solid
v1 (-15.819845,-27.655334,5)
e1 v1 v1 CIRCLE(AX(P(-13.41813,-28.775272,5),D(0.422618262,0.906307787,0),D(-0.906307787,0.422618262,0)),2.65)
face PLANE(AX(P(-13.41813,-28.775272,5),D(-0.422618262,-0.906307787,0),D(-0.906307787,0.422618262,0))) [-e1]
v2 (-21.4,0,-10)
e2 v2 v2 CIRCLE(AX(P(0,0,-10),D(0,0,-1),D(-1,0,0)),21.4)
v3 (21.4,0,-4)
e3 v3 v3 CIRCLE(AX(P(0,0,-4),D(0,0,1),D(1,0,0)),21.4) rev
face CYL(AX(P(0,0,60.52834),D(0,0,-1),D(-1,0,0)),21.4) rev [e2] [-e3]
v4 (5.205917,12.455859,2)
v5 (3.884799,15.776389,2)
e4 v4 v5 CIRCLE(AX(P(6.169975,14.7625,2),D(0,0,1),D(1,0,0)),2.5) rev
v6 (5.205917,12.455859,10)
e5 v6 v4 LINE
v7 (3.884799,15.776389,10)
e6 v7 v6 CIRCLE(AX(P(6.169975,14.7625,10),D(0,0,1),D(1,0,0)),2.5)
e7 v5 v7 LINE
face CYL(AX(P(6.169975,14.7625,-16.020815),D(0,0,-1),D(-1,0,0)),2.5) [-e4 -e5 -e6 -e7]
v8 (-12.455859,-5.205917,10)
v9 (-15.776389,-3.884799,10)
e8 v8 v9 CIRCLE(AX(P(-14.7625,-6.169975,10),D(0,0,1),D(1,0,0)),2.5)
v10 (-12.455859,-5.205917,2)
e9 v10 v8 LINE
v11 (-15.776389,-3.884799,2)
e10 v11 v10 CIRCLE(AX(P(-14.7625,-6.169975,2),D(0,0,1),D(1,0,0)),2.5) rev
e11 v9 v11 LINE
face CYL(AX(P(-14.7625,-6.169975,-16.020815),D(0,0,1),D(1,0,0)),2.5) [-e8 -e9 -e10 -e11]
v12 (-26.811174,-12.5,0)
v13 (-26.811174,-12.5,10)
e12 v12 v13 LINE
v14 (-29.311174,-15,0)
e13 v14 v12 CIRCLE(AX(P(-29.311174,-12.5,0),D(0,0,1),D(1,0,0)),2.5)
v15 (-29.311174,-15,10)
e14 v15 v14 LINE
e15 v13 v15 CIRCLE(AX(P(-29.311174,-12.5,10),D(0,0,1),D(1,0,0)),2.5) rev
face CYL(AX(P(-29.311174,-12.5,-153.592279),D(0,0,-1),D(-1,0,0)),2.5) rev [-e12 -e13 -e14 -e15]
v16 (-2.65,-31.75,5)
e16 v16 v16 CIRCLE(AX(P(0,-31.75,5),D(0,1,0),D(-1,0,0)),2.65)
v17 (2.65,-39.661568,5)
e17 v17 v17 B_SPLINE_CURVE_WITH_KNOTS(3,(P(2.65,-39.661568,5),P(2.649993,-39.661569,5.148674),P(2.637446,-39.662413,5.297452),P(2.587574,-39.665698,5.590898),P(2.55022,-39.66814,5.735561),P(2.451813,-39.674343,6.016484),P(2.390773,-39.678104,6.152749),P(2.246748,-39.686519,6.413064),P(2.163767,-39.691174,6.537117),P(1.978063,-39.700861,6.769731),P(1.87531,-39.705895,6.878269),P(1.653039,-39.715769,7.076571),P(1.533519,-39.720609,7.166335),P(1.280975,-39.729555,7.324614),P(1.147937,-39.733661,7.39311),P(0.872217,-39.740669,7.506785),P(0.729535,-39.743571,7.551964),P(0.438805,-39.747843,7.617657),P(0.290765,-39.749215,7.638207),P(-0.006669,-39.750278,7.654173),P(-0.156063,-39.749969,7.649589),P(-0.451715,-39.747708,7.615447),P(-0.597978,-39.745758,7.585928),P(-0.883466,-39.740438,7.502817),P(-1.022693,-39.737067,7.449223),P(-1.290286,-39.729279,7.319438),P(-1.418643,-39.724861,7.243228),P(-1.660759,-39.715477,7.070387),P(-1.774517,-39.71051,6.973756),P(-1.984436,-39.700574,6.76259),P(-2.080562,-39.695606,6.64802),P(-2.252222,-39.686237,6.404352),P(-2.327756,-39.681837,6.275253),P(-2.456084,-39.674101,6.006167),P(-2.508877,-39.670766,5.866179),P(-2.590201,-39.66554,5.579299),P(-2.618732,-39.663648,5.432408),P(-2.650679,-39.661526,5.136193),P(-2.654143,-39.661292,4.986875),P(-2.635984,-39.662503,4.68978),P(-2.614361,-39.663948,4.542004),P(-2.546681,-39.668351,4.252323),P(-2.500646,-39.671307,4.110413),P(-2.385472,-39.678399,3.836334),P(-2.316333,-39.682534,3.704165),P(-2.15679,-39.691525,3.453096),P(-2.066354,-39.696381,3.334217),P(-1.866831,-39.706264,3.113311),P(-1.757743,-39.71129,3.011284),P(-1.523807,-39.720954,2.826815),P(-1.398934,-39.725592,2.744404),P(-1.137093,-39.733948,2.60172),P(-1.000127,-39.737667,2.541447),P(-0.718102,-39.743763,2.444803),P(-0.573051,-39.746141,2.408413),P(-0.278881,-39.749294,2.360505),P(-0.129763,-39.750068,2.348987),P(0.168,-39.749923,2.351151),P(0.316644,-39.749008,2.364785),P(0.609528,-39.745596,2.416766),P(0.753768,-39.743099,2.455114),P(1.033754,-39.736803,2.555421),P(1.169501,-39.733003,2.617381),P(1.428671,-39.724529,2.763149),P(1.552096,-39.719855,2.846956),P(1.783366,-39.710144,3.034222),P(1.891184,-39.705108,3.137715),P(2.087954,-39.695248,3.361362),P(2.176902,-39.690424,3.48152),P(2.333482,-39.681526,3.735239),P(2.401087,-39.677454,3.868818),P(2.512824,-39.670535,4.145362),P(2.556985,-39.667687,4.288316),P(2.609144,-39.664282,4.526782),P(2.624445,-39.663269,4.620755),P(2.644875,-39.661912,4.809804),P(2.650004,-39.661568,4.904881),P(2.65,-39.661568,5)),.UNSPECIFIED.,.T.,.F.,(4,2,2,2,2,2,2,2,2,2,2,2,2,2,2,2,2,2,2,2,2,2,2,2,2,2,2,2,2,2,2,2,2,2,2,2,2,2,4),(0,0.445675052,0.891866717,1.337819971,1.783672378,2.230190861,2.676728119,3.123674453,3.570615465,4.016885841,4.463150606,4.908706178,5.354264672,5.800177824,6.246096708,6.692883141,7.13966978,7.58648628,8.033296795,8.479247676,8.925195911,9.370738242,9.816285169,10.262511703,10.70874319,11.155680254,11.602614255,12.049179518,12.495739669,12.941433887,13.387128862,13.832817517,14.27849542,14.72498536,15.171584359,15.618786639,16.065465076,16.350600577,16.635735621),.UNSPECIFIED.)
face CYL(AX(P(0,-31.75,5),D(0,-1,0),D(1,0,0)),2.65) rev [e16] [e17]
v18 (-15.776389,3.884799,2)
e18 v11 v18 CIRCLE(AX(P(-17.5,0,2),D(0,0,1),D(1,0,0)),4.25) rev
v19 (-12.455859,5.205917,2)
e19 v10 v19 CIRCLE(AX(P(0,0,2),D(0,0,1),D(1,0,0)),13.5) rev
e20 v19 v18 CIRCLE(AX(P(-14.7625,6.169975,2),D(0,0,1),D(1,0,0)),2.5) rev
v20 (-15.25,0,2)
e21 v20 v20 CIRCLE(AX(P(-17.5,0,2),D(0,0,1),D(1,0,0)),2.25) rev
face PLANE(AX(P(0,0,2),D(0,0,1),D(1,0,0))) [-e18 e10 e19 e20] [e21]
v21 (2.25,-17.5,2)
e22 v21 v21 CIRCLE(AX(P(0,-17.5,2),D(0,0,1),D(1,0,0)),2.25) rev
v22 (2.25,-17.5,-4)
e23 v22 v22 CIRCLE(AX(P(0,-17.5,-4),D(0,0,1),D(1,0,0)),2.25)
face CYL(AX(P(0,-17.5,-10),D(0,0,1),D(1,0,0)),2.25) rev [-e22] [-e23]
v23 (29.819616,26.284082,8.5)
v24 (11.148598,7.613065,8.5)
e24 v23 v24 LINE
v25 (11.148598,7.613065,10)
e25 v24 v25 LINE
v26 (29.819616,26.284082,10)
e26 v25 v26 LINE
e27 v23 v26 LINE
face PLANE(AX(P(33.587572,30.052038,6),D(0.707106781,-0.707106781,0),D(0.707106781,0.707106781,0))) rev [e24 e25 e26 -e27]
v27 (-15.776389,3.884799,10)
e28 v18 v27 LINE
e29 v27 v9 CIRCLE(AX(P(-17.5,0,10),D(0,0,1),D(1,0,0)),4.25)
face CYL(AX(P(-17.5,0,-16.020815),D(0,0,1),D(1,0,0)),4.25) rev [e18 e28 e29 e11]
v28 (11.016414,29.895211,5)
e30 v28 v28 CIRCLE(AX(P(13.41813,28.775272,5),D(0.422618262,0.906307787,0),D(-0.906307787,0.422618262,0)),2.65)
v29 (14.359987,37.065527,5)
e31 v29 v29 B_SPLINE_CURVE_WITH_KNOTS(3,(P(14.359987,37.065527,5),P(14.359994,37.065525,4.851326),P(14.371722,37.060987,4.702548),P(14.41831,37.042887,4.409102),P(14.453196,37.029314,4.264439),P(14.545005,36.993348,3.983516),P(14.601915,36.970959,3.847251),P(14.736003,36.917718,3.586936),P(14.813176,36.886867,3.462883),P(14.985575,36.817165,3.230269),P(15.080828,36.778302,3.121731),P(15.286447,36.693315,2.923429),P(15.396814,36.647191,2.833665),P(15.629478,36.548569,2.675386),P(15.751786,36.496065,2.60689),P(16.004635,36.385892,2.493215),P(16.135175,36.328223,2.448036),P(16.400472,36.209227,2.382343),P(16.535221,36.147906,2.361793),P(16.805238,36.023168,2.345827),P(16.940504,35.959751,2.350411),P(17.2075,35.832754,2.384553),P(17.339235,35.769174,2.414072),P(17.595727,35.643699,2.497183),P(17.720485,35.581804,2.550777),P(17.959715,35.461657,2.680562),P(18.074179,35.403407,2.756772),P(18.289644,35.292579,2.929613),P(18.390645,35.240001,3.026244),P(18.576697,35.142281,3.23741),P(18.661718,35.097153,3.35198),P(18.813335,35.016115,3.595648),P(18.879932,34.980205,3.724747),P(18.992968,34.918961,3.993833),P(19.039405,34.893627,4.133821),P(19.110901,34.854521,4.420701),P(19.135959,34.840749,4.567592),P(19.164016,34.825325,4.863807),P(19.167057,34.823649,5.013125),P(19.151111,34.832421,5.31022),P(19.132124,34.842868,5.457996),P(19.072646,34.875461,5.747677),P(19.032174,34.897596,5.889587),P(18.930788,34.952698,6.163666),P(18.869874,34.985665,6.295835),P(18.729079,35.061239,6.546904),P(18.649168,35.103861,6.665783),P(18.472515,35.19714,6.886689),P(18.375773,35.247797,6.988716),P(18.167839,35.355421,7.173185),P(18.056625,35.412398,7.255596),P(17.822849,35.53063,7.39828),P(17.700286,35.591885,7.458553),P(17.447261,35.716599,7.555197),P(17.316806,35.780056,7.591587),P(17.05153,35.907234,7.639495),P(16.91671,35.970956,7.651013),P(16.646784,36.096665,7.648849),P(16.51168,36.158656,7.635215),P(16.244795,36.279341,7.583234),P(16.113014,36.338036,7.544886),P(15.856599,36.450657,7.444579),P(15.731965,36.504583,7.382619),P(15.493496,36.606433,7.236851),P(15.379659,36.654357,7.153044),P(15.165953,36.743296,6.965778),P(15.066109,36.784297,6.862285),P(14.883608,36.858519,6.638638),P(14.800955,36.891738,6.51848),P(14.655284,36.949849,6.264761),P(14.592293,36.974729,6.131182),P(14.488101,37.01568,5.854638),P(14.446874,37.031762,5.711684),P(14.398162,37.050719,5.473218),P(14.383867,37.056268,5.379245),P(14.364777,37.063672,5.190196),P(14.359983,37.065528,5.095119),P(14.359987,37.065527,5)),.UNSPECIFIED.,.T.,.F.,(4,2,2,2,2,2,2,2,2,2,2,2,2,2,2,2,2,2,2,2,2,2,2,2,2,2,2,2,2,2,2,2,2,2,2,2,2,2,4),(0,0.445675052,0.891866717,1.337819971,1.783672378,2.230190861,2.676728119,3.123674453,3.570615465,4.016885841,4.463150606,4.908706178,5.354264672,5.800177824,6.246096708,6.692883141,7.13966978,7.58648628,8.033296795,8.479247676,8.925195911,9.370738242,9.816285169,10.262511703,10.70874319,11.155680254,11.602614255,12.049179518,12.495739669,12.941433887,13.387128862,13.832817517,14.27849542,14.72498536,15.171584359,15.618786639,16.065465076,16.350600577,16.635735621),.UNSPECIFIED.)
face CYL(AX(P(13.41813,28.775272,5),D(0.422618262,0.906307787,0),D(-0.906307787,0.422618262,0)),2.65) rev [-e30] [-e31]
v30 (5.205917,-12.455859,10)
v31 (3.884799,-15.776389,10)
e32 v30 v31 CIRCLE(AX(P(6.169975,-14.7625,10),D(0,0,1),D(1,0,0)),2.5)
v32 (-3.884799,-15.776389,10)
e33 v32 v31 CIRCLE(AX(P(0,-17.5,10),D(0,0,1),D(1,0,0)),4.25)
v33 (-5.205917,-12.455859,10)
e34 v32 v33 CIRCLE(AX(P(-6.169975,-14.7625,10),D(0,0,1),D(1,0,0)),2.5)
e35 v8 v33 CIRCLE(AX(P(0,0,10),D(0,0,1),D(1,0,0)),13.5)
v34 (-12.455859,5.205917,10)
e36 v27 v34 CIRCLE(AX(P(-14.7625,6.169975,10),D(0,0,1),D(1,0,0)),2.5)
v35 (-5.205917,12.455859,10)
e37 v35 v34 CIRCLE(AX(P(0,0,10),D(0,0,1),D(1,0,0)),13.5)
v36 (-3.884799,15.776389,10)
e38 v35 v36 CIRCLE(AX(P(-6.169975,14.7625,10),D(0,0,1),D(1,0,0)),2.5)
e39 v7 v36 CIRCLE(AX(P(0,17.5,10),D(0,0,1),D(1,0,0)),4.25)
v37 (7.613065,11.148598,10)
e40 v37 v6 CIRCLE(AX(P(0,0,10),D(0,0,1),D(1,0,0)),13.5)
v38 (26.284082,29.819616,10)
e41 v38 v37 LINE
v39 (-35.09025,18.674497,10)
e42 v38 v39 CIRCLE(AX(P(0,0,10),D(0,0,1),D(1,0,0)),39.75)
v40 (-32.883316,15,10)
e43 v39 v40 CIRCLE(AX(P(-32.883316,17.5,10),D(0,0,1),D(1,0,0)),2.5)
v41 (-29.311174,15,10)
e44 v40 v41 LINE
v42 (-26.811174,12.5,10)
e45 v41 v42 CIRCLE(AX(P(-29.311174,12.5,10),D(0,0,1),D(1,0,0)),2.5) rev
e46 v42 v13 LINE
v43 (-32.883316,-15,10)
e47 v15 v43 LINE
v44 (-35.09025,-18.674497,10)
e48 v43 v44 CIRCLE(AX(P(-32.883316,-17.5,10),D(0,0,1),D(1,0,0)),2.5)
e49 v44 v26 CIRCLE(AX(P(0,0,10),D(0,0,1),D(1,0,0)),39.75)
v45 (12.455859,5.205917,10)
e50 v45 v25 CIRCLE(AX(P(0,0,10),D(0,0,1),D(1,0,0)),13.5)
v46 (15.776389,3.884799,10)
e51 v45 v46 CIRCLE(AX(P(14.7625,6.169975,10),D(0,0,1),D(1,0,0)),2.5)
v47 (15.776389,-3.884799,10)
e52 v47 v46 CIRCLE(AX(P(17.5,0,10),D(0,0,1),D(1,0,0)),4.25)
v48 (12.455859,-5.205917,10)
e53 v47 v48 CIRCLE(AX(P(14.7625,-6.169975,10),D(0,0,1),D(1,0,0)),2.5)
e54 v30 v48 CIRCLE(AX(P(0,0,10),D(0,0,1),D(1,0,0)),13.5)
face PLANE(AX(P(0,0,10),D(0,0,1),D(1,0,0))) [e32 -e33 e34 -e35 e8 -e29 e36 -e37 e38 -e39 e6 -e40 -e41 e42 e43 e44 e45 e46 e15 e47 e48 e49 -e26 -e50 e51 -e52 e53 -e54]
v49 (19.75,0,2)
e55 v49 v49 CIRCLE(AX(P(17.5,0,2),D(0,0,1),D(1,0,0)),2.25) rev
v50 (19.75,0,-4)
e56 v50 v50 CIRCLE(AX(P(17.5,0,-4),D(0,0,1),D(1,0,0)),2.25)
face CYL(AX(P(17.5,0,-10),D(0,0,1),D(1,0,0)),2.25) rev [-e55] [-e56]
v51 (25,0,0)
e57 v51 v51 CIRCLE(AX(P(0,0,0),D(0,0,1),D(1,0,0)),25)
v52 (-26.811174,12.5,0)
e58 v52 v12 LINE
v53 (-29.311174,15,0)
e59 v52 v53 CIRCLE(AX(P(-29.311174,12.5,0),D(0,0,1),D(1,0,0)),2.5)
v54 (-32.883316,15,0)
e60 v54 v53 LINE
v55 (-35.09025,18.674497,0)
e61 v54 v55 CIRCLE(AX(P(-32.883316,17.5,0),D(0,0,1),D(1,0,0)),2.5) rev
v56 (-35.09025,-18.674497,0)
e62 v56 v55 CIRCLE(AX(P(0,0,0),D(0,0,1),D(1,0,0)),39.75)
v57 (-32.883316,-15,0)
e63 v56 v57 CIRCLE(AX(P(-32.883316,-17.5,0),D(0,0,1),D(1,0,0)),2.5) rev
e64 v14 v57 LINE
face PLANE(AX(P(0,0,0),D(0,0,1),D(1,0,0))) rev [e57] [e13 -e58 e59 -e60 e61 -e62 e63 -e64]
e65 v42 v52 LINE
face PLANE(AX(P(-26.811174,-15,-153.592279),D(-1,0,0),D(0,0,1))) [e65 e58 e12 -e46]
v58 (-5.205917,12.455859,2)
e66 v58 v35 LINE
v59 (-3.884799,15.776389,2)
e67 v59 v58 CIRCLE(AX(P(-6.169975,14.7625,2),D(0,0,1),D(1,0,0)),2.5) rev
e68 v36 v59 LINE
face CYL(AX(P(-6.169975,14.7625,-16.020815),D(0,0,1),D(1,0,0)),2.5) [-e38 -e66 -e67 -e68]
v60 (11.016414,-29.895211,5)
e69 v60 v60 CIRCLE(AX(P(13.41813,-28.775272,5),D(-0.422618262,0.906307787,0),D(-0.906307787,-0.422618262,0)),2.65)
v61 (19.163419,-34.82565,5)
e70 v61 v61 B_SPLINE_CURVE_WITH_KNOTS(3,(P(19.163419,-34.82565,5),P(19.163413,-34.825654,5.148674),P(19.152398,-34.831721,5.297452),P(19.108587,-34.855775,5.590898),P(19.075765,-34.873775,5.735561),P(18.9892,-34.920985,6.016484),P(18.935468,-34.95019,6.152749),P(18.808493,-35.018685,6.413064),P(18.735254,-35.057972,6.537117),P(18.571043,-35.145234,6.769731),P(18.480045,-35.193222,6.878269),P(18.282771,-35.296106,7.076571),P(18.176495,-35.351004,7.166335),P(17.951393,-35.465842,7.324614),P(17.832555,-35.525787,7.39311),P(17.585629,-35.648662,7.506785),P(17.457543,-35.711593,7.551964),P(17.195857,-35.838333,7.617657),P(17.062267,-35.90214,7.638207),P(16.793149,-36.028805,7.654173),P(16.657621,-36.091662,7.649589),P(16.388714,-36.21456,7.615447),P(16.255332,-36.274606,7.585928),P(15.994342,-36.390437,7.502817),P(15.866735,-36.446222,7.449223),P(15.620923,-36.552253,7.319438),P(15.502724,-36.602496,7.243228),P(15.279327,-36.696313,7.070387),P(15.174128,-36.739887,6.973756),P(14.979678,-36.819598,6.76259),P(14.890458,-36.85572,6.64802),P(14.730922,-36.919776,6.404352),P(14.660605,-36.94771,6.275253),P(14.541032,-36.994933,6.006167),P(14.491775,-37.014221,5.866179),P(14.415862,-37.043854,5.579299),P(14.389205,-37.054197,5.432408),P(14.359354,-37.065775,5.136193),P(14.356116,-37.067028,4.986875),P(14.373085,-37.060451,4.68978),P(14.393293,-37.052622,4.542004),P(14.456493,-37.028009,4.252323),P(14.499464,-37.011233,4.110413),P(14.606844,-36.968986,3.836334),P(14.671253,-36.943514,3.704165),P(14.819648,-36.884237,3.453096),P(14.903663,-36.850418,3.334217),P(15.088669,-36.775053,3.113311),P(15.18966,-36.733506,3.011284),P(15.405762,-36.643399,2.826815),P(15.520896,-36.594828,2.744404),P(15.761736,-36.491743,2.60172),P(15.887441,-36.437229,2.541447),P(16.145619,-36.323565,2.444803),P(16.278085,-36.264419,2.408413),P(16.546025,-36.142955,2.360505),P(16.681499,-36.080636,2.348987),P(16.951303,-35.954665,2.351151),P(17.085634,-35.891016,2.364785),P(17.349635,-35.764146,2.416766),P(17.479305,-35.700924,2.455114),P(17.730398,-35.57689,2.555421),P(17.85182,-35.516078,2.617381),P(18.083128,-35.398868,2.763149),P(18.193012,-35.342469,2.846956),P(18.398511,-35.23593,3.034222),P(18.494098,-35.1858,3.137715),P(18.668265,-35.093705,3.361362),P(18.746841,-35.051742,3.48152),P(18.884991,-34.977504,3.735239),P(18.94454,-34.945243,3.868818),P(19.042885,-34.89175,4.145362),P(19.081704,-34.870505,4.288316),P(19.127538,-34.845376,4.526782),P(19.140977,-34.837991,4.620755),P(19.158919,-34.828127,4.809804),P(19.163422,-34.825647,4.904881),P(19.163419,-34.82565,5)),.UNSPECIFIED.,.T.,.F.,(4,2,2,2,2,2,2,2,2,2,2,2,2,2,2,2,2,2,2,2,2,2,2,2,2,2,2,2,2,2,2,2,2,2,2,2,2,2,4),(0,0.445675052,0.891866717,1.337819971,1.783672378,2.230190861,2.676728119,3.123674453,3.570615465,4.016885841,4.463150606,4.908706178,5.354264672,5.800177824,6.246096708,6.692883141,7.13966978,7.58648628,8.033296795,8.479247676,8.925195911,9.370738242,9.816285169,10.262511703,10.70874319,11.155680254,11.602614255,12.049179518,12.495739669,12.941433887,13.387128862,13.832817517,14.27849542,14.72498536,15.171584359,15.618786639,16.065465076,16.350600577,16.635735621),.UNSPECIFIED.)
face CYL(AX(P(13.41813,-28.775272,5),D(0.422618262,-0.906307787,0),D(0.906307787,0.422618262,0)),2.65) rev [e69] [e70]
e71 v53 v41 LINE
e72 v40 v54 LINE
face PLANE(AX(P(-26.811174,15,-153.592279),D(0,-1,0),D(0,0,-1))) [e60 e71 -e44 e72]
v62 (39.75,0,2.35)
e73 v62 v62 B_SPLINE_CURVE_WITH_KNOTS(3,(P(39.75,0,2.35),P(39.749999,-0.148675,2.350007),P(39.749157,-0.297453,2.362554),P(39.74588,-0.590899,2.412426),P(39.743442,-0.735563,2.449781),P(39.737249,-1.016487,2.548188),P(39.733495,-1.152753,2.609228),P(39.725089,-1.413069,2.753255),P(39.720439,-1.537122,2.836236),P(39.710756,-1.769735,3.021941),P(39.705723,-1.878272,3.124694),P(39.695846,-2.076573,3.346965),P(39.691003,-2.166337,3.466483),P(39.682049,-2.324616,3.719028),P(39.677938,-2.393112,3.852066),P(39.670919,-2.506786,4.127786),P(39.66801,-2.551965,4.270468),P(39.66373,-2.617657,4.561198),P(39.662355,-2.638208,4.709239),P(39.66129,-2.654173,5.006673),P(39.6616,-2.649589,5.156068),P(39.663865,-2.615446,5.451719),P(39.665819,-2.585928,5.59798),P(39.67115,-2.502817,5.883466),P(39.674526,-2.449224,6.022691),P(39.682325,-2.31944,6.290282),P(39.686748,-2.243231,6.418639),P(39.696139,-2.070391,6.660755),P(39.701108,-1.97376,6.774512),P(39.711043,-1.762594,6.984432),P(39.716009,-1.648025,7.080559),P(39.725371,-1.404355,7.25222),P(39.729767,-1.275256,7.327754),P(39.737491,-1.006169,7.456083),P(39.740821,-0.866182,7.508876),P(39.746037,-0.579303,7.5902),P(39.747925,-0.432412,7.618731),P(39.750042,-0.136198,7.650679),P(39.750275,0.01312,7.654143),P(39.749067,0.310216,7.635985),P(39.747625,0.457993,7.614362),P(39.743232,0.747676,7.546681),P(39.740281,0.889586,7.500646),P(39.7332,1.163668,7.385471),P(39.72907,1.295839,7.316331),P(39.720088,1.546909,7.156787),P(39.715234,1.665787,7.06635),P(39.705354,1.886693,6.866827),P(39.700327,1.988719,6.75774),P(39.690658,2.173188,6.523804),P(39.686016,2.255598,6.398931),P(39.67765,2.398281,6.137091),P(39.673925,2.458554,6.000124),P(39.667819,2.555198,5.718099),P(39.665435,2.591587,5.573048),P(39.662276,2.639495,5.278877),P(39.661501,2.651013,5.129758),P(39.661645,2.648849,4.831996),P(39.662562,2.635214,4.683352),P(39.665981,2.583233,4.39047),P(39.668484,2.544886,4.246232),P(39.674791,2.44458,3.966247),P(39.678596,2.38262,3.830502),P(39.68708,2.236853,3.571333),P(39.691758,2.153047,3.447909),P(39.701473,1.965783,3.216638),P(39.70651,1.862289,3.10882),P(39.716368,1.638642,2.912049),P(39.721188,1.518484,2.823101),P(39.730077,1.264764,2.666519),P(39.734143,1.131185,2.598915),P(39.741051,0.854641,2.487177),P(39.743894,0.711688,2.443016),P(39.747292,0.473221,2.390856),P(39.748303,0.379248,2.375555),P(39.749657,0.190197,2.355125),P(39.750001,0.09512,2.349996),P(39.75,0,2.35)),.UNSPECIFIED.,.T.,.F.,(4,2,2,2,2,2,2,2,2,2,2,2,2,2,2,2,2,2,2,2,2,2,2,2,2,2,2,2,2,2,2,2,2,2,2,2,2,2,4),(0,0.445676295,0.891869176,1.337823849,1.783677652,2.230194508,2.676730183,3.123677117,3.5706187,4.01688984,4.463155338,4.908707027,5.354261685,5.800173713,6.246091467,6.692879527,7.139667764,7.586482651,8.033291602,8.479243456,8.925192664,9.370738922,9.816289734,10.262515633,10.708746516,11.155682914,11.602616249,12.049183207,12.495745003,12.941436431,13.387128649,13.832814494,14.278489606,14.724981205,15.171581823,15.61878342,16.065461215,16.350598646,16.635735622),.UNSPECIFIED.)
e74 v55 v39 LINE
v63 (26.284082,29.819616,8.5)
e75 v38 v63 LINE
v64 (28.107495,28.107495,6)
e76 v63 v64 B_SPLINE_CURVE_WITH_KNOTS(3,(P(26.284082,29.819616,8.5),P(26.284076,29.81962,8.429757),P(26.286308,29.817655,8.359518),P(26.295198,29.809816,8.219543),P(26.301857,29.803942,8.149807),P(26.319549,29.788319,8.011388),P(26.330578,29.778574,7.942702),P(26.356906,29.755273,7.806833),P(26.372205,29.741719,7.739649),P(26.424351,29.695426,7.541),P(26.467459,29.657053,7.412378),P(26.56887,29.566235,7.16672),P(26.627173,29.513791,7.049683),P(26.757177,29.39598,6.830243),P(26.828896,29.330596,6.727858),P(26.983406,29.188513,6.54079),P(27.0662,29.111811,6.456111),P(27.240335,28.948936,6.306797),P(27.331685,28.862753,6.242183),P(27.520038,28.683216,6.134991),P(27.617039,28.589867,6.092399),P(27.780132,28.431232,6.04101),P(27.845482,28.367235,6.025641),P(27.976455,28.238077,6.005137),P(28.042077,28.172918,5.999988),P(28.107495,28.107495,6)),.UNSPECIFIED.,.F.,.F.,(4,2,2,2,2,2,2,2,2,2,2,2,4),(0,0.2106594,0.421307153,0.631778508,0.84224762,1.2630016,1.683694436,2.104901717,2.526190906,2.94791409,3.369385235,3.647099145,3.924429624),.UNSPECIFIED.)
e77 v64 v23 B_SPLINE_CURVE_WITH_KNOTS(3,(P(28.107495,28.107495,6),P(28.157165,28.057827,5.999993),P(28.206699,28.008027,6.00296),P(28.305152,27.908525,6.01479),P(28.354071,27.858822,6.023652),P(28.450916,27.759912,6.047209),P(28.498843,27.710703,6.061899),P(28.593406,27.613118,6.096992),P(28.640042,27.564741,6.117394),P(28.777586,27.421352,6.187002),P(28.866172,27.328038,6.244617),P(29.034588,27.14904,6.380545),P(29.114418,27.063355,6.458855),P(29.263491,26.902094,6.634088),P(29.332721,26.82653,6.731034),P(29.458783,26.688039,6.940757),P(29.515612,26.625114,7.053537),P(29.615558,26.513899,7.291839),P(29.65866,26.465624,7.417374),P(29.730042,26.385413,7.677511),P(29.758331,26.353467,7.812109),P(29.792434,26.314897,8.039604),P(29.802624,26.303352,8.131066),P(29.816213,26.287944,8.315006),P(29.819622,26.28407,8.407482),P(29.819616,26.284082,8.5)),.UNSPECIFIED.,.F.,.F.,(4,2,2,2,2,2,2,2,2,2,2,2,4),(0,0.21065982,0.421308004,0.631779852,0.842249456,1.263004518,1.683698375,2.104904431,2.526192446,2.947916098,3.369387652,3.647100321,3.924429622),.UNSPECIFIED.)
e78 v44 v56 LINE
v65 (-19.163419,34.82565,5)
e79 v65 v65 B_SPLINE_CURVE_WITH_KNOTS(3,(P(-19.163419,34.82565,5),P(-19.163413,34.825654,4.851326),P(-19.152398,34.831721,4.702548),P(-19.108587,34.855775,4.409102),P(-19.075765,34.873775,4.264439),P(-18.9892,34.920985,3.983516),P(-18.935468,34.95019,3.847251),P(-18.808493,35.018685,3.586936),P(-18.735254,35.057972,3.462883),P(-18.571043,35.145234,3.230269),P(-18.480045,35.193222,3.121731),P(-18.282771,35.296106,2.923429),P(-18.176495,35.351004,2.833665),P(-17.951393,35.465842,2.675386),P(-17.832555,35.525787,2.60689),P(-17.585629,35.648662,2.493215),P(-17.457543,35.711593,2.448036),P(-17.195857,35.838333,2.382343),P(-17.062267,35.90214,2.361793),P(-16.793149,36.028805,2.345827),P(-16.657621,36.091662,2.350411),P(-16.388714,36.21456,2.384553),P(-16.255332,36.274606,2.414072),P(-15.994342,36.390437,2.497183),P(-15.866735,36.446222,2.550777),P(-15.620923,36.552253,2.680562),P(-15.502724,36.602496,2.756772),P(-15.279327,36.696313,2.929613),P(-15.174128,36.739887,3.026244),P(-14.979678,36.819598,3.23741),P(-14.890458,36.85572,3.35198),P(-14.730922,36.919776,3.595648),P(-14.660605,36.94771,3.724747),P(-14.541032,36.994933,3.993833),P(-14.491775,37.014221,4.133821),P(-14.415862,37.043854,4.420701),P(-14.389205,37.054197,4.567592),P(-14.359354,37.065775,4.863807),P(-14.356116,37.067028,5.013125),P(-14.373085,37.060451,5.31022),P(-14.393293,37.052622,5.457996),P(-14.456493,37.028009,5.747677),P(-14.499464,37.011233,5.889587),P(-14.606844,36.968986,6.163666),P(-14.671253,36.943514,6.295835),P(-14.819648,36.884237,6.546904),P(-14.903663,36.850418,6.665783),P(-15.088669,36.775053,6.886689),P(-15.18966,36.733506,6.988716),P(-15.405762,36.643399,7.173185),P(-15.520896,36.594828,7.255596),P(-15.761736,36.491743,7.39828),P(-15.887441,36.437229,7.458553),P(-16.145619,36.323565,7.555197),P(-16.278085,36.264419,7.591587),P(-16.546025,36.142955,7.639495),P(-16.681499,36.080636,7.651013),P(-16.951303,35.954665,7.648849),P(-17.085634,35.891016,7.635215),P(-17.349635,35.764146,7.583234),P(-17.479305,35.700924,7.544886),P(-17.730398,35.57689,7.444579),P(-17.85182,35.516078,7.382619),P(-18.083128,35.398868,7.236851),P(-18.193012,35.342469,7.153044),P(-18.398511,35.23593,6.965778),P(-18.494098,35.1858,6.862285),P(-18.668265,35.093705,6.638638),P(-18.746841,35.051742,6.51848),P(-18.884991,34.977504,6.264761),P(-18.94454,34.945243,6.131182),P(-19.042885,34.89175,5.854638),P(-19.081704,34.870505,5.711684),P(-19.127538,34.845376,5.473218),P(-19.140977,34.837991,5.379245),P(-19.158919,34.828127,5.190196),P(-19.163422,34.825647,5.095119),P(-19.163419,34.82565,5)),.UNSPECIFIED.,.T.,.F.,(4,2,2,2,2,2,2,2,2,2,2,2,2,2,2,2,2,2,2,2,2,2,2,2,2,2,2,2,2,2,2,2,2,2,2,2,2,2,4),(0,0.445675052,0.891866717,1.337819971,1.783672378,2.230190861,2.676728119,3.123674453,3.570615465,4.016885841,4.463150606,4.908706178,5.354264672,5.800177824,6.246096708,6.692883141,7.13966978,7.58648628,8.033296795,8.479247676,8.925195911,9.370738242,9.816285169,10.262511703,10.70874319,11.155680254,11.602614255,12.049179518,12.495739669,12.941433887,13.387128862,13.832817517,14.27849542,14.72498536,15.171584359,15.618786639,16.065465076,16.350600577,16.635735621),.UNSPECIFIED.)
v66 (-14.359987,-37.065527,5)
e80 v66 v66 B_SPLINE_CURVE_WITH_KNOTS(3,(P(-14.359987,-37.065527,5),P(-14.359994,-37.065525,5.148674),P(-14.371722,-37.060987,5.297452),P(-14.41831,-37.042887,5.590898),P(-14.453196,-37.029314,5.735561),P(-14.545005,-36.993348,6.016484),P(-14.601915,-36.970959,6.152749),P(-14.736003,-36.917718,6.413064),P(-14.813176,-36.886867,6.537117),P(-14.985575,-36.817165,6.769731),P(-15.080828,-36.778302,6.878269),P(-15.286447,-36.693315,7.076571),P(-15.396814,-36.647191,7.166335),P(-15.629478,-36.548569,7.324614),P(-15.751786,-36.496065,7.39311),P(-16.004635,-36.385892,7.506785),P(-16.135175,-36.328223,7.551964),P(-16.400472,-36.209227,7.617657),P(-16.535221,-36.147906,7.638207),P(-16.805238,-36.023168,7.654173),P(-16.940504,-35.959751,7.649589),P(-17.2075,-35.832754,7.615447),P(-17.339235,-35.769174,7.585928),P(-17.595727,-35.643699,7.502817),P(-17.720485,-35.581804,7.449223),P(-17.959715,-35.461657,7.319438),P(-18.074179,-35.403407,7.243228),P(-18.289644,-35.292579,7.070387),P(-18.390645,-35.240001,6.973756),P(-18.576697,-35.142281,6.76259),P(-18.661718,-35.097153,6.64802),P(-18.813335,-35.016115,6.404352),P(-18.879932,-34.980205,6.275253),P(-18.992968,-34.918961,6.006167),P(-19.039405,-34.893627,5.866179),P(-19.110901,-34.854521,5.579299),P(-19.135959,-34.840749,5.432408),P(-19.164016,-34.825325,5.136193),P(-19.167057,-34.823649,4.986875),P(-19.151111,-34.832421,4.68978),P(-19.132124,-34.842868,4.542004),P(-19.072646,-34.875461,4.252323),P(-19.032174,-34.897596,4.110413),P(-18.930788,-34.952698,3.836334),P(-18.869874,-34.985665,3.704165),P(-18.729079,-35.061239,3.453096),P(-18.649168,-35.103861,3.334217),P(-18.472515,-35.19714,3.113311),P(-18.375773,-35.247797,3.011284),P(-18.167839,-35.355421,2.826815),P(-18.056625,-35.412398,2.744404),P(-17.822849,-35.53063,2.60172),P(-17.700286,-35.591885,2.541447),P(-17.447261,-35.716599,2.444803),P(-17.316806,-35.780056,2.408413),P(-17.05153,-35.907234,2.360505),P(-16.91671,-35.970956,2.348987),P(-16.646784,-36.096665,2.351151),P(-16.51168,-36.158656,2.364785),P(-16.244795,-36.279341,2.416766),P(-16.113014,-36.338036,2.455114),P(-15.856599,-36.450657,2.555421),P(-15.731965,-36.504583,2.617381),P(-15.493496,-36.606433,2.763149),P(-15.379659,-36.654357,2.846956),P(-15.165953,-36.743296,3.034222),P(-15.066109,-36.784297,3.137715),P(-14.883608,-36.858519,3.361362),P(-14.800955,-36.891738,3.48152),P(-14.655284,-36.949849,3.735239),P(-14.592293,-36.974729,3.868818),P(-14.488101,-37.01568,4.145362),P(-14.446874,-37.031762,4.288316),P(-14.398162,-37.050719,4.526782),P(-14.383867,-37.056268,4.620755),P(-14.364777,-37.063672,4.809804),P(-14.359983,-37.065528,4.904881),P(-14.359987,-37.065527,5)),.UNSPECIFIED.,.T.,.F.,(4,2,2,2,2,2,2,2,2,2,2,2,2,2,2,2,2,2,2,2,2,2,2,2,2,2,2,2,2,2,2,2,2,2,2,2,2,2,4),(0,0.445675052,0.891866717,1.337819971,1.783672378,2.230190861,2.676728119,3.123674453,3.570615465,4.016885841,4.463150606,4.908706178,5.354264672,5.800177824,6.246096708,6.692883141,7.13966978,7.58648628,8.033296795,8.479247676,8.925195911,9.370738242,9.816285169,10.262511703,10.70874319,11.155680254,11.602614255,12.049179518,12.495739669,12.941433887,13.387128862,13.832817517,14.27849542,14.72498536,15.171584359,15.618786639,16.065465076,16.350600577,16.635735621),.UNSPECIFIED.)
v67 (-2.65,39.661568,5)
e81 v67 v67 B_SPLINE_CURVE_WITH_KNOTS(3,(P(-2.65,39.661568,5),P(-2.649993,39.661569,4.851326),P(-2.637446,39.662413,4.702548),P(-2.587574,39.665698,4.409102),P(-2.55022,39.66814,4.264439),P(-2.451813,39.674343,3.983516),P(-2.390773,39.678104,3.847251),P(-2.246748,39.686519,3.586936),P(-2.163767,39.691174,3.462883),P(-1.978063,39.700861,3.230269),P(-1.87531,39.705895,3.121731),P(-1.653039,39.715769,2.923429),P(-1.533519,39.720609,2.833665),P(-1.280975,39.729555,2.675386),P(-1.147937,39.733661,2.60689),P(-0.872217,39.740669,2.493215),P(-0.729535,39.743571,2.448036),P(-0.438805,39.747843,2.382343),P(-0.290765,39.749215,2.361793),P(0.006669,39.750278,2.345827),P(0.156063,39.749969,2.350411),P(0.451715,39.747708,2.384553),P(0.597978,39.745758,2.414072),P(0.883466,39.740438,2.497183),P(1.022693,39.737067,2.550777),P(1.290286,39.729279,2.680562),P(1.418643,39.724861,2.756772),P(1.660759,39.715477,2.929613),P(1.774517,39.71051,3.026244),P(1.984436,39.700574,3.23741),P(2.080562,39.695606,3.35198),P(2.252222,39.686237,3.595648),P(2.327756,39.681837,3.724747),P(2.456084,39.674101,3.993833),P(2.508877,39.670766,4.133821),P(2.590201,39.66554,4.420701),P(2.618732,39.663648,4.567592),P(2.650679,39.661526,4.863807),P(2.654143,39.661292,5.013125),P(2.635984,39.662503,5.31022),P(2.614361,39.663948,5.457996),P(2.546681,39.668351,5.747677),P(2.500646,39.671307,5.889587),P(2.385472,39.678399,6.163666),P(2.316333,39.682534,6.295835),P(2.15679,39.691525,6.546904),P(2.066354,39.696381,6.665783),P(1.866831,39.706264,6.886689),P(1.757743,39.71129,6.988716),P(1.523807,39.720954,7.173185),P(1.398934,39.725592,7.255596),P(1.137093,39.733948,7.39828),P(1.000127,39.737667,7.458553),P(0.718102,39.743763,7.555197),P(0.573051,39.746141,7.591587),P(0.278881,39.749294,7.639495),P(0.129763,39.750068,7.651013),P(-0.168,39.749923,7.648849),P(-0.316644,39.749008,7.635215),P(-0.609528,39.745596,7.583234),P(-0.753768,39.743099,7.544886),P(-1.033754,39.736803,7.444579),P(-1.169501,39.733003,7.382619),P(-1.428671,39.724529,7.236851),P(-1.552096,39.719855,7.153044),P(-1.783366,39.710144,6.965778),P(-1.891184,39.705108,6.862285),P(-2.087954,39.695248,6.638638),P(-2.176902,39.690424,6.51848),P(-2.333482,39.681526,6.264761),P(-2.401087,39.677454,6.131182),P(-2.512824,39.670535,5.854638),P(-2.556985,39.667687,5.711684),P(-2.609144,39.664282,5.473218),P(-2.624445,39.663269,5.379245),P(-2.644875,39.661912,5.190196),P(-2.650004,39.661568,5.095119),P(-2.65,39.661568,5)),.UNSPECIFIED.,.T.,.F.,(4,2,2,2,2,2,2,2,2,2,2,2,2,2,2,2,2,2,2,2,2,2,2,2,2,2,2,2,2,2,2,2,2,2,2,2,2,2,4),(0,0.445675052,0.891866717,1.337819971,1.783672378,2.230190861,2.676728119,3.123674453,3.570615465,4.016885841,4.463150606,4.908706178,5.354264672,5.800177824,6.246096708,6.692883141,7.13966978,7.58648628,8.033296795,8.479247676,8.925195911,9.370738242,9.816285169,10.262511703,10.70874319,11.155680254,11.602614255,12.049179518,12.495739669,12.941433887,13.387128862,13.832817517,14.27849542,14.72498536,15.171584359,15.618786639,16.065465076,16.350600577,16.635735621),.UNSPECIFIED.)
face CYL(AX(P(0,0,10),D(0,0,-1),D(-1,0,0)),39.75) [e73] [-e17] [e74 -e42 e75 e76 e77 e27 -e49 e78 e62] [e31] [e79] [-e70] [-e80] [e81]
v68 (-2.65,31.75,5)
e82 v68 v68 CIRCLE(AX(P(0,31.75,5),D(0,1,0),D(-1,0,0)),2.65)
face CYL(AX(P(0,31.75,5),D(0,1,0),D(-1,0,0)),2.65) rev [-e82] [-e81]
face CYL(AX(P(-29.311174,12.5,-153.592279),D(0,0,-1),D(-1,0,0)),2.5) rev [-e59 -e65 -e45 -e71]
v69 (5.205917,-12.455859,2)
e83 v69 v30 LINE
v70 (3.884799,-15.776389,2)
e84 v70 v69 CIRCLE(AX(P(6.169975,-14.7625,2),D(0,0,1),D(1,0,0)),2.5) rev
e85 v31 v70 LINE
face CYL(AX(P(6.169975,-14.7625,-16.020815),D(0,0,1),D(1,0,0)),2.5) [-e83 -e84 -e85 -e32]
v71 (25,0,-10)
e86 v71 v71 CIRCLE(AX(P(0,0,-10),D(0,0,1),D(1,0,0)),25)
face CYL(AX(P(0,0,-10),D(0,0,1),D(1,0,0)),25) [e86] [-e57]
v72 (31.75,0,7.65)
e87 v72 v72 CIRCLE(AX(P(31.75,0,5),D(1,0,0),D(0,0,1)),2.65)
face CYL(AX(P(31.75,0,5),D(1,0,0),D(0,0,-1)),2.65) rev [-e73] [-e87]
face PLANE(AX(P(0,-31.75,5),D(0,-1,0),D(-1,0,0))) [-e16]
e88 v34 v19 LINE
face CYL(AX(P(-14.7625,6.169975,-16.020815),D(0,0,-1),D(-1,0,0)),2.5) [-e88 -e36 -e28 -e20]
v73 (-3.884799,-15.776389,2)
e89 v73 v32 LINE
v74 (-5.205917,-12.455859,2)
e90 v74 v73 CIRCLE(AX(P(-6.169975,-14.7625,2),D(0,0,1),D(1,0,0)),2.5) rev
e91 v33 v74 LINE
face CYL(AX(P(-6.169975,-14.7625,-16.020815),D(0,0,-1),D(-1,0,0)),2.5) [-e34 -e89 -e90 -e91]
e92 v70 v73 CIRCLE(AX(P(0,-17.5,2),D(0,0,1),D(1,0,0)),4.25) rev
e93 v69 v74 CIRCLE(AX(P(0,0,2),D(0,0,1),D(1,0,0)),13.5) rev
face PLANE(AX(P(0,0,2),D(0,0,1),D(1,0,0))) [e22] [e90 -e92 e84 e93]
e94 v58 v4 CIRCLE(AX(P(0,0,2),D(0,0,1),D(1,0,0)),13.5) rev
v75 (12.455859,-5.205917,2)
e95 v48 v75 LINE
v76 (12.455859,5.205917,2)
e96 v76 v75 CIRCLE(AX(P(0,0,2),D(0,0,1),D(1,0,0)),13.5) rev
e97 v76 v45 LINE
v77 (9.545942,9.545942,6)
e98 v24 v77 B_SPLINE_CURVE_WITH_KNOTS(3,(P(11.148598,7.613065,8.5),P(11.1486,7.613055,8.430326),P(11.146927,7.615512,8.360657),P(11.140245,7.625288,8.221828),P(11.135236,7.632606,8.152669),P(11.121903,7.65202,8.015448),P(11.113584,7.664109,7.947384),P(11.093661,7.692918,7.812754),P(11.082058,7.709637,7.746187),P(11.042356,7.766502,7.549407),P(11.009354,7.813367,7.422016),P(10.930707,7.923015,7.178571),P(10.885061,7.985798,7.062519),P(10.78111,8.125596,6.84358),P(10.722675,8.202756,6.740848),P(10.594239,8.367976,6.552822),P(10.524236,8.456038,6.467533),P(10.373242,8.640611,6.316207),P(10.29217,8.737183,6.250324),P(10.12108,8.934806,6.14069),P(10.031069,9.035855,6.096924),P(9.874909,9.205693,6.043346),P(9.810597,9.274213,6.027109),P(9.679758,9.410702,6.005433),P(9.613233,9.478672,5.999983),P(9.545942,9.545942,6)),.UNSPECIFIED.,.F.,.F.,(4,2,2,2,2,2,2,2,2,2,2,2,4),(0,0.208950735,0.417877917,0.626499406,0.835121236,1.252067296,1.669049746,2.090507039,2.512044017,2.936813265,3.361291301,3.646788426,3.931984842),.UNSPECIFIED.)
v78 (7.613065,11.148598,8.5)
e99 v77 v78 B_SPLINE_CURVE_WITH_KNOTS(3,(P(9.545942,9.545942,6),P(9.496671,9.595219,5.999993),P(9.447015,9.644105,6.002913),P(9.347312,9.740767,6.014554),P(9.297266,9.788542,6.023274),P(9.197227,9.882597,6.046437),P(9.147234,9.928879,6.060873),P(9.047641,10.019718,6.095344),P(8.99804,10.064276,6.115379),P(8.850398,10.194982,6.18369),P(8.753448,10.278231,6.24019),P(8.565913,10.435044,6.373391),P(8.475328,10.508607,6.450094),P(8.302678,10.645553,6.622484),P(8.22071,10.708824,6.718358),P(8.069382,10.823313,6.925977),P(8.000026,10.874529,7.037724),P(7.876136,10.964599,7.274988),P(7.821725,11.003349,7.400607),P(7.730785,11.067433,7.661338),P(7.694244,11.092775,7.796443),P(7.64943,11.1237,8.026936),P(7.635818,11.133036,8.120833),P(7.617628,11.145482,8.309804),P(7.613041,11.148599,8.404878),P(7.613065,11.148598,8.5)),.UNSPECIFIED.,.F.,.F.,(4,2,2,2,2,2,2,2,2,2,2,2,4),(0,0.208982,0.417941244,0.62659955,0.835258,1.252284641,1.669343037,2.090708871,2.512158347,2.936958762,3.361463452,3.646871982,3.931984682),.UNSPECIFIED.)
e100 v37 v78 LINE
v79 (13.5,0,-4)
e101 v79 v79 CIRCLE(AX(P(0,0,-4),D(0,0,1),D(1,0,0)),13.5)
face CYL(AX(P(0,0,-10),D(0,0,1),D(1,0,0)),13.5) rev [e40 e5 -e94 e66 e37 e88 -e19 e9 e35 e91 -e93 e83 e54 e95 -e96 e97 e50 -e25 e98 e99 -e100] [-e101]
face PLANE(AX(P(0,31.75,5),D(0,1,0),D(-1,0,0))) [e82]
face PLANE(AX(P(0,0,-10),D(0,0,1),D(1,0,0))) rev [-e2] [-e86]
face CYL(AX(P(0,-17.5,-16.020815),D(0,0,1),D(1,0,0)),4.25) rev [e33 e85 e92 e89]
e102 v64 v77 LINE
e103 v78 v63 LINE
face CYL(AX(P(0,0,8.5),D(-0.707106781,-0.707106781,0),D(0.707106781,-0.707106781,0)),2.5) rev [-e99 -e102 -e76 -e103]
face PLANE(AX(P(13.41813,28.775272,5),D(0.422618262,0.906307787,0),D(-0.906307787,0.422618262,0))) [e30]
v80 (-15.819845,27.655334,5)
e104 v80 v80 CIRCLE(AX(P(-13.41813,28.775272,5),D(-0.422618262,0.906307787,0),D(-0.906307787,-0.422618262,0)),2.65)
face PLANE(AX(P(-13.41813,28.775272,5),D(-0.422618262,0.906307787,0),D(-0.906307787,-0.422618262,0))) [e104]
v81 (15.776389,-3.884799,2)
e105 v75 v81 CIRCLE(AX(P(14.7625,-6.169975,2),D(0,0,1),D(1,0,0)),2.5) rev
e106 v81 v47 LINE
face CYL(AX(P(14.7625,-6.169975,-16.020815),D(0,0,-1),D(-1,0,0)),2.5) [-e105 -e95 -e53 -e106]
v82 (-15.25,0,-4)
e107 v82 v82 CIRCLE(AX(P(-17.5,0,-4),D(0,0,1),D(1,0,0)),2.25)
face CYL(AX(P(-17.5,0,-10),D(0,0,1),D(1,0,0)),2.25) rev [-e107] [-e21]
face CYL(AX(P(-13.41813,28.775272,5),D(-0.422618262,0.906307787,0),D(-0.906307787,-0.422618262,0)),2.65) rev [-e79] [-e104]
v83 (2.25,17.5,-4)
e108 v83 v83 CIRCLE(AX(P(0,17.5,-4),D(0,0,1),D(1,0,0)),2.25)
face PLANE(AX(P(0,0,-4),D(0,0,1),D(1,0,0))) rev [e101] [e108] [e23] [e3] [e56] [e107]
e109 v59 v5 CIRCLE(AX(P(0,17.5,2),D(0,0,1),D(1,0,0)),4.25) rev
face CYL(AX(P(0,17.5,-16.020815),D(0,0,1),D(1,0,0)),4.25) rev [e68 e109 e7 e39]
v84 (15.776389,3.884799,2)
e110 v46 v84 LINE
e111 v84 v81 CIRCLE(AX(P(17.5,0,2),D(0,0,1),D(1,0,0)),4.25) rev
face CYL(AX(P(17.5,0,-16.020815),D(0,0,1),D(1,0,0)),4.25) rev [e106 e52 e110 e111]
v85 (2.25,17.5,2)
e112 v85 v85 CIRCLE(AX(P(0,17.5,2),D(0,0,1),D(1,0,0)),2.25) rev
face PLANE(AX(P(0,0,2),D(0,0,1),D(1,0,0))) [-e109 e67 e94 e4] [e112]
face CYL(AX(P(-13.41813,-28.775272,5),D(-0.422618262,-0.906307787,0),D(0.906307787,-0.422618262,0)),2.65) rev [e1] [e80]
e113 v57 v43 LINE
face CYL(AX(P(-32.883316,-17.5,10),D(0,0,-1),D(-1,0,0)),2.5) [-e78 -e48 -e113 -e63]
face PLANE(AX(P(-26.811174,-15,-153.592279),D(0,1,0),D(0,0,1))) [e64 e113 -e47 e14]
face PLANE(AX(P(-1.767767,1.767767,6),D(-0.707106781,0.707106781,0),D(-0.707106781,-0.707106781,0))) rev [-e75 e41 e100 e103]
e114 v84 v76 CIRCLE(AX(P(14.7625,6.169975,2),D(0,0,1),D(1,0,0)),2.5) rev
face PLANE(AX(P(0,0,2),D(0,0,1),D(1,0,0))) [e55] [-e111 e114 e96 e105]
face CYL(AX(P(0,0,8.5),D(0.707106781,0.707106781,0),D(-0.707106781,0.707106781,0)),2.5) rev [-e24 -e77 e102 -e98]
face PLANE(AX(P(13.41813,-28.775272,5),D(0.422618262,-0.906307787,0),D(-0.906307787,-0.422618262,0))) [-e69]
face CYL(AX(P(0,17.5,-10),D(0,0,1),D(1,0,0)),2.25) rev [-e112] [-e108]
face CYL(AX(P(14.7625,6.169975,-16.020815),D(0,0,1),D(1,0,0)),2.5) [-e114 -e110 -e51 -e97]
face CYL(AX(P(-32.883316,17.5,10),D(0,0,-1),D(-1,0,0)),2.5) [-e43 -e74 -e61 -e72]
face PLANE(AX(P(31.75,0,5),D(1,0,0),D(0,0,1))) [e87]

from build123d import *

# Parameters (mm, degrees)
SKETCH_1_R                = 39.75
EXTRUDE_1_DEPTH           = 10
SKETCH_7_R                = 2.65
CUT_EXTRUDE_5_DEPTH       = 8
PATTERN_CIRCULAR_1_COUNT  = 2
PATTERN_CIRCULAR_1_ANGLE  = 25
F_1_THE_OTHER_WAY_COUNT   = 2
F_1_THE_OTHER_WAY_ANGLE   = 25
MIRROR_1_COPY_1_SKETCH_R  = 2.65
MIRROR_1_COPY_1_DEPTH     = 8
MIRROR_1_COPY_2_SKETCH_R  = 2.65
MIRROR_1_COPY_2_DEPTH     = 8
SKETCH_9_R                = 2.65
CUT_EXTRUDE_7_DEPTH       = 8
PATTERN_CIRCULAR_2_COUNT  = 2
CUT_EXTRUDE_START         = -10
CUT_EXTRUDE_8_DEPTH       = 10
CUT_EXTRUDE_13_DEPTH      = 4
SKETCH_12_R               = 25
EXTRUDE_2_DEPTH           = 10
SKETCH_16_R               = 21.4
CUT_EXTRUDE_14_DEPTH      = 6
CUT_EXTRUDE_10_DEPTH      = 58.09750448
CUT_EXTRUDE_10_DEPTH_BACK = 58.09750448
SKETCH_13_R               = 2.25
SKETCH_13_R_2             = 13.5
SKETCH_17_R               = 4.25
CUT_EXTRUDE_15_DEPTH      = 8
FILLET_1_R                = 2.5


# Read off the part's stored shape, not the designer's step: Вырез-Вытянуть8
with BuildPart() as part:
    # Эскиз1 → Бобышка-Вытянуть1 (new body)
    with BuildSketch(Plane.XY):
        Circle(SKETCH_1_R)
    extrude(amount=EXTRUDE_1_DEPTH)

    # Эскиз7 → Вырез-Вытянуть5 (cut)
    with BuildSketch(Plane(origin=(0, 39.75, 0), x_dir=(0, 0, -1), z_dir=(0, 1, 0))):
        with Locations(Location((-5, 0, 0), (0, 0, 90))):
            Circle(SKETCH_7_R)
    cut_extrude_5 = extrude(amount=-CUT_EXTRUDE_5_DEPTH, mode=Mode.SUBTRACT)

    # Круговой массив1: Вырез-Вытянуть5 ×2 about axis
    pattern_circular_1_axis = Axis((0, 0, 10), (0, 0, -1))
    for i in range(1, PATTERN_CIRCULAR_1_COUNT):
        add(cut_extrude_5.rotate(pattern_circular_1_axis, i * PATTERN_CIRCULAR_1_ANGLE / (PATTERN_CIRCULAR_1_COUNT - 1)), mode=Mode.SUBTRACT)

    # 1 the other way: Вырез-Вытянуть5 ×2 about axis
    f_1_the_other_way_axis = Axis((0, 0, 10), (0, 0, 1))
    for i in range(1, F_1_THE_OTHER_WAY_COUNT):
        add(cut_extrude_5.rotate(f_1_the_other_way_axis, i * F_1_THE_OTHER_WAY_ANGLE / (F_1_THE_OTHER_WAY_COUNT - 1)), mode=Mode.SUBTRACT)

    # Зеркальное отражение1: Вырез-Вытянуть5 across plane
    add(cut_extrude_5.mirror(Plane.ZX), mode=Mode.SUBTRACT)

    # Зеркальное отражение1 copy 1 sketch → Зеркальное отражение1 copy 1 (cut)
    with BuildSketch(Plane(origin=(16.799075904, -36.025734535, 0), x_dir=(0, 0, -1), z_dir=(0.4226182617407035, -0.906307787036648, 0))):
        with Locations((-5, 0)):
            Circle(MIRROR_1_COPY_1_SKETCH_R)
    extrude(amount=-MIRROR_1_COPY_1_DEPTH, mode=Mode.SUBTRACT)

    # Зеркальное отражение1 copy 2 sketch → Зеркальное отражение1 copy 2 (cut)
    with BuildSketch(Plane(origin=(-16.799075904, -36.025734535, 0), x_dir=(0, 0, -1), z_dir=(-0.42261826174069717, -0.9063077870366509, 0))):
        with Locations((-5, 0)):
            Circle(MIRROR_1_COPY_2_SKETCH_R)
    extrude(amount=-MIRROR_1_COPY_2_DEPTH, mode=Mode.SUBTRACT)

    # Эскиз9 → Вырез-Вытянуть7 (cut)
    with BuildSketch(Plane.ZY.offset(39.75)):
        with Locations((5, 0)):
            Circle(SKETCH_9_R)
    cut_extrude_7 = extrude(amount=-CUT_EXTRUDE_7_DEPTH, mode=Mode.SUBTRACT)

    # Круговой массив2: Вырез-Вытянуть7 ×2 about axis
    pattern_circular_2_axis = Axis((0, 0, 10), (0, 0, -1))
    for i in range(1, PATTERN_CIRCULAR_2_COUNT):
        add(cut_extrude_7.rotate(pattern_circular_2_axis, i * 360 / PATTERN_CIRCULAR_2_COUNT), mode=Mode.SUBTRACT)

    # Вырез-Вытянуть8 outline → Вырез-Вытянуть8 (cut)
    with BuildSketch(Plane(origin=(0, 0, 0), x_dir=(-1, 0, 0), z_dir=(0, 0, -1)).offset(CUT_EXTRUDE_START)):
        with BuildLine():
            Line((36.811173575, 15), (26.811173575, 15))
            Line((26.811173575, 15), (26.811173575, -15))
            Line((26.811173575, -15), (36.811173575, -15))
            ThreePointArc((36.811173575, -15), (39.75, 0), (36.811173575, 15))
        make_face()
    extrude(amount=CUT_EXTRUDE_8_DEPTH, mode=Mode.SUBTRACT)

    # Эскиз15 → Вырез-Вытянуть13 (cut)
    with BuildSketch(Plane.XY.offset(10)):
        Polygon((-1.767766953, 1.767766953), (1.767766953, -1.767766953), (33.587572106, 30.0520382), (30.0520382, 33.587572106), align=None)
    extrude(amount=-CUT_EXTRUDE_13_DEPTH, mode=Mode.SUBTRACT)

    # Эскиз12 → Бобышка-Вытянуть2 (add)
    with BuildSketch(Plane.XY):
        Circle(SKETCH_12_R)
    extrude(amount=-EXTRUDE_2_DEPTH)

    # Эскиз16 → Вырез-Вытянуть14 (cut)
    with BuildSketch(Plane(origin=(0, 0, -10), x_dir=(-1, 0, 0), z_dir=(0, 0, -1))):
        Circle(SKETCH_16_R)
    extrude(amount=-CUT_EXTRUDE_14_DEPTH, mode=Mode.SUBTRACT)

    # Эскиз13 → Вырез-Вытянуть10 (cut, two sides: drawn at the far end of the back side and taken through both)
    with BuildSketch(Plane.XY.offset(-CUT_EXTRUDE_10_DEPTH_BACK)):
        with Locations((17.5, 0)):
            Circle(SKETCH_13_R)
        with Locations((0, -17.5)):
            Circle(SKETCH_13_R)
        with Locations((-17.5, 0)):
            Circle(SKETCH_13_R)
        with Locations((0, 17.5)):
            Circle(SKETCH_13_R)
        Circle(SKETCH_13_R_2)
    extrude(amount=CUT_EXTRUDE_10_DEPTH + CUT_EXTRUDE_10_DEPTH_BACK, mode=Mode.SUBTRACT)

    # Эскиз17 → Вырез-Вытянуть15 (cut)
    with BuildSketch(Plane.XY.offset(10)):
        with Locations((0, 17.5)):
            Circle(SKETCH_17_R)
        with Locations((17.5, 0)):
            Circle(SKETCH_17_R)
        with Locations((0, -17.5)):
            Circle(SKETCH_17_R)
        with Locations((-17.5, 0)):
            Circle(SKETCH_17_R)
    extrude(amount=-CUT_EXTRUDE_15_DEPTH, mode=Mode.SUBTRACT)

    # Скругление1
    fillet_1_edges = [part.edges().sort_by_distance(p)[0] for p in [
        (20.48410737, 16.948573464, 6),
        (16.948573464, 20.48410737, 6),
        (-26.811173575, 15, 5),
        (-26.811173575, -15, 5),
    ]]
    fillet(fillet_1_edges, radius=FILLET_1_R - 0.0004)  # a hair under: the kernel refuses the full size
    fillet_1_2_edges = [part.edges().sort_by_distance(p)[0] for p in [
        (-36.811173575, -15, 5),
        (-36.811173575, 15, 5),
        (-1.259999544, -13.441071429, 6),
        (1.259999544, -13.441071429, 6),
        (13.441071429, -1.259999544, 6),
        (13.441071429, 1.259999544, 6),
        (-13.441071429, 1.259999544, 6),
        (-13.441071429, -1.259999544, 6),
        (-1.259999544, 13.441071429, 6),
        (1.259999544, 13.441071429, 6),
    ]]
    fillet(fillet_1_2_edges, radius=FILLET_1_R)


solid = part.part
